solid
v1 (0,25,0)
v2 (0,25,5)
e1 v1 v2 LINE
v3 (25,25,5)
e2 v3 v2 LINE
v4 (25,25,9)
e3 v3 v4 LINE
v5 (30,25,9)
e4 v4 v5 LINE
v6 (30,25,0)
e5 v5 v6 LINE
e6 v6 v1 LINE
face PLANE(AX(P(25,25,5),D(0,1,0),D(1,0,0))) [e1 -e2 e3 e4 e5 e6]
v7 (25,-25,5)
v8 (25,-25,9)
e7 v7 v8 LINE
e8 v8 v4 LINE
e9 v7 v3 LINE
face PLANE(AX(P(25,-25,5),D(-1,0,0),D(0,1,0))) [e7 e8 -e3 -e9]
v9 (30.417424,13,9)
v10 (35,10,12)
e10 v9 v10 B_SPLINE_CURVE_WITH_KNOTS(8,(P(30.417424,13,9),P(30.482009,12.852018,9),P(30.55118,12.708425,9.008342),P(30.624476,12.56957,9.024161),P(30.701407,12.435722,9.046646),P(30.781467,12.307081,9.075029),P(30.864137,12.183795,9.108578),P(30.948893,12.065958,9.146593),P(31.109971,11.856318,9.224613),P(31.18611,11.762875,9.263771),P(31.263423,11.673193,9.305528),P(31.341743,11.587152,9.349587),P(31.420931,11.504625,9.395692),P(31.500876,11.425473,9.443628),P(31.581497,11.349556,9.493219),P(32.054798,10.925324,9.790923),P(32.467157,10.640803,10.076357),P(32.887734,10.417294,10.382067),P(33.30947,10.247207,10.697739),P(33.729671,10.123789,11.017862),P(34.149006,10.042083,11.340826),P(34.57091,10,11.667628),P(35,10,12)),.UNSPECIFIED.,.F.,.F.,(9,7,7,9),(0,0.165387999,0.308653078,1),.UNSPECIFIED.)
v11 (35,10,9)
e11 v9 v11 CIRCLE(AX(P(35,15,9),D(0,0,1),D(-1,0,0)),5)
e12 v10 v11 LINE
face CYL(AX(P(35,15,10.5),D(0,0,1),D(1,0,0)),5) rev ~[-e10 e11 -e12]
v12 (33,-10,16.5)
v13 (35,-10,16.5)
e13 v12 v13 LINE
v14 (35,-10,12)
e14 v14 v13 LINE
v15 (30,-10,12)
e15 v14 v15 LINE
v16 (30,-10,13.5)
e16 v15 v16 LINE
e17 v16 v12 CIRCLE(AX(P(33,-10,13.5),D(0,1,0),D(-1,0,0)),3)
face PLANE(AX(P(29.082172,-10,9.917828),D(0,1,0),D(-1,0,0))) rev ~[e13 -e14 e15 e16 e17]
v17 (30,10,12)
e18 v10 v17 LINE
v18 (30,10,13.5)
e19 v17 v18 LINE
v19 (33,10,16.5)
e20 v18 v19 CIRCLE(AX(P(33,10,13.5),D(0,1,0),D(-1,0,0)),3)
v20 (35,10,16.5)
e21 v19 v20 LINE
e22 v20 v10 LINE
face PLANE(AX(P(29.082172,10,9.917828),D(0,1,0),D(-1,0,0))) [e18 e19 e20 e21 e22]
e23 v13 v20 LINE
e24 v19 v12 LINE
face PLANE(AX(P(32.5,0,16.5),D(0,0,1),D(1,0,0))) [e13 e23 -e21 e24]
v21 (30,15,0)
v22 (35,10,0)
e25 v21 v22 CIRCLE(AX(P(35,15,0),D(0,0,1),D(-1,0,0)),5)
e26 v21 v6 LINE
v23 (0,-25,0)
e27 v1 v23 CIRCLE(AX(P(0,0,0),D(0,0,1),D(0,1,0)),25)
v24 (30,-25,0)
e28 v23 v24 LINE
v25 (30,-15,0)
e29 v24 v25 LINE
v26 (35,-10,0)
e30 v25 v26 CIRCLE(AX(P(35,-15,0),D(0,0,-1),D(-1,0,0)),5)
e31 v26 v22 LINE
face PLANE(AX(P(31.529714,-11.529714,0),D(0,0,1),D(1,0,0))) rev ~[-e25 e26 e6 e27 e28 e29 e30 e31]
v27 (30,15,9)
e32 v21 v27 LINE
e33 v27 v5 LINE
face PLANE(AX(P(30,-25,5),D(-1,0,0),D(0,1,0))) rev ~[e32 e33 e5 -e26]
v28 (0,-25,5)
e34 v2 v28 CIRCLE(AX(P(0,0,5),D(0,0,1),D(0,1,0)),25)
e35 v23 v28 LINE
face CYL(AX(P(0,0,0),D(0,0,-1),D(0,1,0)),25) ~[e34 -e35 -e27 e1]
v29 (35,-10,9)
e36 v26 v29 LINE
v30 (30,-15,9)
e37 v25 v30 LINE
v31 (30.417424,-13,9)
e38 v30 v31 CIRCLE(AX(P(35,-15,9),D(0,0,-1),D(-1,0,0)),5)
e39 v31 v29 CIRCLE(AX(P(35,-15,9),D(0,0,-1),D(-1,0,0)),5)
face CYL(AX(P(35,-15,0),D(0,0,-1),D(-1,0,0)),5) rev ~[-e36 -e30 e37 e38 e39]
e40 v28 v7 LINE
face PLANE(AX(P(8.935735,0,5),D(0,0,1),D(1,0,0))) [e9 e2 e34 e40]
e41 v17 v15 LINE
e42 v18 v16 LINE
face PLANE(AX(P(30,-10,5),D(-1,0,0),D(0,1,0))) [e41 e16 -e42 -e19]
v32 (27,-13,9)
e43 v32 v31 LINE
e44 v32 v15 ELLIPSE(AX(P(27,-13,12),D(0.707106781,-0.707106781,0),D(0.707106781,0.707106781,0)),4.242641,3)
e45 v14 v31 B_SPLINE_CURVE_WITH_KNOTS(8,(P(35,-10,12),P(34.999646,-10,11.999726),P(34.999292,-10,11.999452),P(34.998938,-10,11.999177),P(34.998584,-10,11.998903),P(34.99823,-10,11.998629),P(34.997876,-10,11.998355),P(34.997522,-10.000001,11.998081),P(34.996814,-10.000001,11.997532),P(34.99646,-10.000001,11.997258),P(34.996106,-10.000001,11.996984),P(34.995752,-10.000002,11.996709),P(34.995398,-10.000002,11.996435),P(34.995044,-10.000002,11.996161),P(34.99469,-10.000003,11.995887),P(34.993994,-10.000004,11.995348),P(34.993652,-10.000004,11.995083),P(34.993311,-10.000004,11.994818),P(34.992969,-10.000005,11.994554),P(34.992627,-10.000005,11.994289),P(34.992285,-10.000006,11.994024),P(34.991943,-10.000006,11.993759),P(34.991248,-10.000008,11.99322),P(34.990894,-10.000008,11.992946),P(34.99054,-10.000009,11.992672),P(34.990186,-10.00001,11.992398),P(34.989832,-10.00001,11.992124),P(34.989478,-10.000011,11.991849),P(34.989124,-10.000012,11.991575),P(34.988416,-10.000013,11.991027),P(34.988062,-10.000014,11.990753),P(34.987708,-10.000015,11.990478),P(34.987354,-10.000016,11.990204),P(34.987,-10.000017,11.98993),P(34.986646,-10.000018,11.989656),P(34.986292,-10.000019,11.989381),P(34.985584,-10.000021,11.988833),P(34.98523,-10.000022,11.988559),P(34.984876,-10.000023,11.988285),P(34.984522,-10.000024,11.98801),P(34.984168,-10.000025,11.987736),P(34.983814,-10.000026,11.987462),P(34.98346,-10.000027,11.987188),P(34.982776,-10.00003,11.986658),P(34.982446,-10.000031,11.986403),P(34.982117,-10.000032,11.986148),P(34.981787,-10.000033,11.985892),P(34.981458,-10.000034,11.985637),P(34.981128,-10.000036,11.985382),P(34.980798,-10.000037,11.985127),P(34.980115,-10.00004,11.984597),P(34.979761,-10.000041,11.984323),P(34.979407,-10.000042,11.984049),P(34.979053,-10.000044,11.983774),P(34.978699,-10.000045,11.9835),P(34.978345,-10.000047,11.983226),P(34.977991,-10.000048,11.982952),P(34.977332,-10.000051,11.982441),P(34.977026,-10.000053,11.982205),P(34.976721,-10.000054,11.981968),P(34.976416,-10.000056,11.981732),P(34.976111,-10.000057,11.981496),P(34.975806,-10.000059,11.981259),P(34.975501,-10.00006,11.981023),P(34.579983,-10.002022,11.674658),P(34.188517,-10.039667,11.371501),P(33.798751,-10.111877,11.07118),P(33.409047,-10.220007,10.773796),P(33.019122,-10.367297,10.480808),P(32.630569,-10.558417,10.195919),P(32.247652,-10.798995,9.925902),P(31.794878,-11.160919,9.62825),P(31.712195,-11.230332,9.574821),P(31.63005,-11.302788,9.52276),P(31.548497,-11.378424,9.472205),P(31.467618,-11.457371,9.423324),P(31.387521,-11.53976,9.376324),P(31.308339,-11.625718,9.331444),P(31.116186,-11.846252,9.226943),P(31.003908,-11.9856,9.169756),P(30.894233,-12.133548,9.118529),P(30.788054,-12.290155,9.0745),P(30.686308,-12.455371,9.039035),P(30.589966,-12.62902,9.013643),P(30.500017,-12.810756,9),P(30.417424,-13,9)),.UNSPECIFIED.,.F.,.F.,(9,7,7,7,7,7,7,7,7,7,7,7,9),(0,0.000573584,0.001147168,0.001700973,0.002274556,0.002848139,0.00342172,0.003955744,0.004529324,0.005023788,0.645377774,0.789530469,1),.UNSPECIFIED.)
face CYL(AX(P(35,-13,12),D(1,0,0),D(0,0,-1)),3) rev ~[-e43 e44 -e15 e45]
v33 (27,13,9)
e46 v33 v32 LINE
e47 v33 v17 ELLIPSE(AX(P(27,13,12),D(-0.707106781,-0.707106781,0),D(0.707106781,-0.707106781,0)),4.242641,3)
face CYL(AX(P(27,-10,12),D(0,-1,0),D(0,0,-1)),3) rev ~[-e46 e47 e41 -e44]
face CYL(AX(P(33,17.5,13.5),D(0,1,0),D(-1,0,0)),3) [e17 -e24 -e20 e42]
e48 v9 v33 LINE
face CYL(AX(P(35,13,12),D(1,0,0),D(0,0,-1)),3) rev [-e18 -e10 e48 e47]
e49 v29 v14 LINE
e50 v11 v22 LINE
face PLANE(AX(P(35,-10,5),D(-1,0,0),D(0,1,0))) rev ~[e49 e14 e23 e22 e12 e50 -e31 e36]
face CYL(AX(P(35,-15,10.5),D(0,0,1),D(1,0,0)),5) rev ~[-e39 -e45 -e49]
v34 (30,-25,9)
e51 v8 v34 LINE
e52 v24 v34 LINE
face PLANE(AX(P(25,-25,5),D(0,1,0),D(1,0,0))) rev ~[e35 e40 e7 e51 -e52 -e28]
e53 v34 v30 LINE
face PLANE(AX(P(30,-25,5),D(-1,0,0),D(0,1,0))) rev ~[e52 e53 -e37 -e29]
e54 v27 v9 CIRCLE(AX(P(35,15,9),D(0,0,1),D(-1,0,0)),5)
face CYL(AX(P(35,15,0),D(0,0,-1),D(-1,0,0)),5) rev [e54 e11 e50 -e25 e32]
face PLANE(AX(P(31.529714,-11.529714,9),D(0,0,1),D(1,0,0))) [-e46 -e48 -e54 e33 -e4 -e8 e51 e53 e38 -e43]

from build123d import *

# Parameters (mm, degrees)
F1_DEPTH     = 5
F2_W         = 5
F2_H         = 50
F3_DEPTH     = 4
F4_W         = 5
F4_H         = 20
F5_DEPTH     = 11.5
F6_T1_DEPTH  = 9
F7_T1_DEPTH  = 20
F7_T6_DEPTH  = 5
F7_S7_R      = 5.0000000001
F7_T8_DEPTH  = 5
F7_T12_DEPTH = 5
F7_S13_R     = 5.0000000001
F7_T14_DEPTH = 5
F7_T19_DEPTH = 12.5
F7_T24_DEPTH = 27.5
F7_T31_DEPTH = 27.5
F7_T35_DEPTH = 12.5
F7_T39_DEPTH = 35


# Not quite as in the source:
# - a fillet or chamfer that OpenCascade refuses, or shapes differently, is made with other operations: its cross-section is extruded or revolved along the edge and cut away or added


with BuildPart() as f1:
    # F0 (on Top) → F1 (new body)
    with BuildSketch(Plane.XY):
        with BuildLine():
            Line((30, 25), (0, 25))
            ThreePointArc((0, 25), (-25, 0), (0, -25))
            Line((0, -25), (30, -25))
            Line((30, -25), (30, -10))
            Line((30, -10), (35, -10))
            Line((35, -10), (35, 10))
            Line((35, 10), (30, 10))
            Line((30, 10), (30, 25))
        make_face()
    extrude(amount=F1_DEPTH)

    # F2 (on face) → F3 (join)
    with BuildSketch(Plane.XY.offset(5)):
        with Locations((27.5, 0)):
            Rectangle(F2_W, F2_H)
    extrude(amount=F3_DEPTH)

    # F4 (on face) → F5 (join)
    with BuildSketch(Plane.XY.offset(5)):
        with Locations((32.5, 0)):
            Rectangle(F4_W, F4_H)
    extrude(amount=F5_DEPTH)

    # F6: fillet of radius 5 on 3 edges, made by hand

    # F6_s2 → F6_t1 (join)
    with BuildSketch(Plane.XY):
        with BuildLine():
            ThreePointArc((30, -15), (31.4644660941, -11.4644660941), (35, -10))
            Line((35, -10), (30, -10))
            Line((30, -10), (30, -15))
        make_face()
        with BuildLine():
            ThreePointArc((30, 15), (31.4644660941, 11.4644660941), (35, 10))
            Line((35, 10), (30, 10))
            Line((30, 10), (30, 15))
        make_face()
    extrude(amount=F6_T1_DEPTH)

    # F7: fillet of radius 3 on 4 edges, made by hand

    # F7_s2 → F7_t1 (join)
    with BuildSketch(Plane.XZ.offset(-10)):
        with BuildLine():
            ThreePointArc((27, 9), (29.1213203436, 9.8786796564), (30, 12))
            Line((30, 12), (30, 9))
            Line((30, 9), (27, 9))
        make_face()
    extrude(amount=F7_T1_DEPTH)


with BuildPart() as f7_tool4:
    # F7_s5 → F7_t6 (new body)
    with BuildSketch(Plane.YZ.offset(35)):
        with BuildLine():
            ThreePointArc((-13, 9), (-10.8786796564, 9.8786796564), (-10, 12))
            Line((-10, 12), (-10, 9))
            Line((-10, 9), (-13, 9))
        make_face()
    extrude(amount=-F7_T6_DEPTH)

    # F7_s7 → F7_t8 (cut, symmetric)
    with BuildSketch(Plane.XY.offset(10.5)):
        with Locations((35.0000000001, -15.0000000001)):
            Circle(F7_S7_R)
    extrude(amount=F7_T8_DEPTH, both=True, mode=Mode.SUBTRACT)


with BuildPart() as f1_1:
    add(f1.part)

    # F7_t3: union F7_tool4
    add(f7_tool4.part)


with BuildPart() as f7_tool10:
    # F7_s11 → F7_t12 (new body)
    with BuildSketch(Plane.YZ.offset(35)):
        with BuildLine():
            ThreePointArc((13, 9), (10.8786796564, 9.8786796564), (10, 12))
            Line((10, 12), (10, 9))
            Line((10, 9), (13, 9))
        make_face()
    extrude(amount=-F7_T12_DEPTH)

    # F7_s13 → F7_t14 (cut, symmetric)
    with BuildSketch(Plane.XY.offset(10.5)):
        with Locations((35.0000000001, 15.0000000001)):
            Circle(F7_S13_R)
    extrude(amount=F7_T14_DEPTH, both=True, mode=Mode.SUBTRACT)


with BuildPart() as f1_2:
    add(f1_1.part)

    # F7_t9: union F7_tool10
    add(f7_tool10.part)


with BuildPart() as f7_tool17:
    # F7_s18 → F7_t19 (new body)
    with BuildSketch(Plane.YZ.offset(35)):
        with BuildLine():
            ThreePointArc((-13, 9), (-10.8786796564, 9.8786796564), (-10, 12))
            Line((-10, 12), (-10, 9))
            Line((-10, 9), (-13, 9))
        make_face()
    extrude(amount=-F7_T19_DEPTH)

    split(bisect_by=Plane.YZ.offset(25), keep=Keep.TOP)

    split(bisect_by=Plane.YZ.offset(30), keep=Keep.BOTTOM)


with BuildPart() as f7_tool22:
    # F7_s23 → F7_t24 (new body)
    with BuildSketch(Plane.XZ.offset(17.5)):
        with BuildLine():
            ThreePointArc((27, 9), (29.1213203436, 9.8786796564), (30, 12))
            Line((30, 12), (30, 9))
            Line((30, 9), (27, 9))
        make_face()
    extrude(amount=-F7_T24_DEPTH)

    split(bisect_by=Plane.XZ.offset(10), keep=Keep.TOP)


with BuildPart() as f7_tool17_1:
    add(f7_tool17.part)

    # F7_t26: intersect F7_tool22
    add(f7_tool22.part, mode=Mode.INTERSECT)


with BuildPart() as f1_3:
    add(f1_2.part)

    # F7_t15: union F7_tool17
    add(f7_tool17_1.part)


with BuildPart() as f7_tool29:
    # F7_s30 → F7_t31 (new body)
    with BuildSketch(Plane.XZ.offset(10)):
        with BuildLine():
            ThreePointArc((27, 9), (29.1213203436, 9.8786796564), (30, 12))
            Line((30, 12), (30, 9))
            Line((30, 9), (27, 9))
        make_face()
    extrude(amount=-F7_T31_DEPTH)

    split(bisect_by=Plane.XZ.offset(-10), keep=Keep.BOTTOM)


with BuildPart() as f7_tool33:
    # F7_s34 → F7_t35 (new body)
    with BuildSketch(Plane.YZ.offset(35)):
        with BuildLine():
            ThreePointArc((13, 9), (10.8786796564, 9.8786796564), (10, 12))
            Line((10, 12), (10, 9))
            Line((10, 9), (13, 9))
        make_face()
    extrude(amount=-F7_T35_DEPTH)

    split(bisect_by=Plane.YZ.offset(25), keep=Keep.TOP)

    split(bisect_by=Plane.YZ.offset(30), keep=Keep.BOTTOM)


with BuildPart() as f7_tool29_1:
    add(f7_tool29.part)

    # F7_t38: intersect F7_tool33
    add(f7_tool33.part, mode=Mode.INTERSECT)


with BuildPart() as f1_4:
    add(f1_3.part)

    # F7_t27: union F7_tool29
    add(f7_tool29_1.part)

    # F7_s40 → F7_t39 (cut)
    with BuildSketch(Plane.XZ.offset(-17.5)):
        with BuildLine():
            ThreePointArc((30, 13.5), (30.8786796564, 15.6213203436), (33, 16.5))
            Line((33, 16.5), (30, 16.5))
            Line((30, 16.5), (30, 13.5))
        make_face()
    extrude(amount=F7_T39_DEPTH, mode=Mode.SUBTRACT)


solid = f1_4.part
